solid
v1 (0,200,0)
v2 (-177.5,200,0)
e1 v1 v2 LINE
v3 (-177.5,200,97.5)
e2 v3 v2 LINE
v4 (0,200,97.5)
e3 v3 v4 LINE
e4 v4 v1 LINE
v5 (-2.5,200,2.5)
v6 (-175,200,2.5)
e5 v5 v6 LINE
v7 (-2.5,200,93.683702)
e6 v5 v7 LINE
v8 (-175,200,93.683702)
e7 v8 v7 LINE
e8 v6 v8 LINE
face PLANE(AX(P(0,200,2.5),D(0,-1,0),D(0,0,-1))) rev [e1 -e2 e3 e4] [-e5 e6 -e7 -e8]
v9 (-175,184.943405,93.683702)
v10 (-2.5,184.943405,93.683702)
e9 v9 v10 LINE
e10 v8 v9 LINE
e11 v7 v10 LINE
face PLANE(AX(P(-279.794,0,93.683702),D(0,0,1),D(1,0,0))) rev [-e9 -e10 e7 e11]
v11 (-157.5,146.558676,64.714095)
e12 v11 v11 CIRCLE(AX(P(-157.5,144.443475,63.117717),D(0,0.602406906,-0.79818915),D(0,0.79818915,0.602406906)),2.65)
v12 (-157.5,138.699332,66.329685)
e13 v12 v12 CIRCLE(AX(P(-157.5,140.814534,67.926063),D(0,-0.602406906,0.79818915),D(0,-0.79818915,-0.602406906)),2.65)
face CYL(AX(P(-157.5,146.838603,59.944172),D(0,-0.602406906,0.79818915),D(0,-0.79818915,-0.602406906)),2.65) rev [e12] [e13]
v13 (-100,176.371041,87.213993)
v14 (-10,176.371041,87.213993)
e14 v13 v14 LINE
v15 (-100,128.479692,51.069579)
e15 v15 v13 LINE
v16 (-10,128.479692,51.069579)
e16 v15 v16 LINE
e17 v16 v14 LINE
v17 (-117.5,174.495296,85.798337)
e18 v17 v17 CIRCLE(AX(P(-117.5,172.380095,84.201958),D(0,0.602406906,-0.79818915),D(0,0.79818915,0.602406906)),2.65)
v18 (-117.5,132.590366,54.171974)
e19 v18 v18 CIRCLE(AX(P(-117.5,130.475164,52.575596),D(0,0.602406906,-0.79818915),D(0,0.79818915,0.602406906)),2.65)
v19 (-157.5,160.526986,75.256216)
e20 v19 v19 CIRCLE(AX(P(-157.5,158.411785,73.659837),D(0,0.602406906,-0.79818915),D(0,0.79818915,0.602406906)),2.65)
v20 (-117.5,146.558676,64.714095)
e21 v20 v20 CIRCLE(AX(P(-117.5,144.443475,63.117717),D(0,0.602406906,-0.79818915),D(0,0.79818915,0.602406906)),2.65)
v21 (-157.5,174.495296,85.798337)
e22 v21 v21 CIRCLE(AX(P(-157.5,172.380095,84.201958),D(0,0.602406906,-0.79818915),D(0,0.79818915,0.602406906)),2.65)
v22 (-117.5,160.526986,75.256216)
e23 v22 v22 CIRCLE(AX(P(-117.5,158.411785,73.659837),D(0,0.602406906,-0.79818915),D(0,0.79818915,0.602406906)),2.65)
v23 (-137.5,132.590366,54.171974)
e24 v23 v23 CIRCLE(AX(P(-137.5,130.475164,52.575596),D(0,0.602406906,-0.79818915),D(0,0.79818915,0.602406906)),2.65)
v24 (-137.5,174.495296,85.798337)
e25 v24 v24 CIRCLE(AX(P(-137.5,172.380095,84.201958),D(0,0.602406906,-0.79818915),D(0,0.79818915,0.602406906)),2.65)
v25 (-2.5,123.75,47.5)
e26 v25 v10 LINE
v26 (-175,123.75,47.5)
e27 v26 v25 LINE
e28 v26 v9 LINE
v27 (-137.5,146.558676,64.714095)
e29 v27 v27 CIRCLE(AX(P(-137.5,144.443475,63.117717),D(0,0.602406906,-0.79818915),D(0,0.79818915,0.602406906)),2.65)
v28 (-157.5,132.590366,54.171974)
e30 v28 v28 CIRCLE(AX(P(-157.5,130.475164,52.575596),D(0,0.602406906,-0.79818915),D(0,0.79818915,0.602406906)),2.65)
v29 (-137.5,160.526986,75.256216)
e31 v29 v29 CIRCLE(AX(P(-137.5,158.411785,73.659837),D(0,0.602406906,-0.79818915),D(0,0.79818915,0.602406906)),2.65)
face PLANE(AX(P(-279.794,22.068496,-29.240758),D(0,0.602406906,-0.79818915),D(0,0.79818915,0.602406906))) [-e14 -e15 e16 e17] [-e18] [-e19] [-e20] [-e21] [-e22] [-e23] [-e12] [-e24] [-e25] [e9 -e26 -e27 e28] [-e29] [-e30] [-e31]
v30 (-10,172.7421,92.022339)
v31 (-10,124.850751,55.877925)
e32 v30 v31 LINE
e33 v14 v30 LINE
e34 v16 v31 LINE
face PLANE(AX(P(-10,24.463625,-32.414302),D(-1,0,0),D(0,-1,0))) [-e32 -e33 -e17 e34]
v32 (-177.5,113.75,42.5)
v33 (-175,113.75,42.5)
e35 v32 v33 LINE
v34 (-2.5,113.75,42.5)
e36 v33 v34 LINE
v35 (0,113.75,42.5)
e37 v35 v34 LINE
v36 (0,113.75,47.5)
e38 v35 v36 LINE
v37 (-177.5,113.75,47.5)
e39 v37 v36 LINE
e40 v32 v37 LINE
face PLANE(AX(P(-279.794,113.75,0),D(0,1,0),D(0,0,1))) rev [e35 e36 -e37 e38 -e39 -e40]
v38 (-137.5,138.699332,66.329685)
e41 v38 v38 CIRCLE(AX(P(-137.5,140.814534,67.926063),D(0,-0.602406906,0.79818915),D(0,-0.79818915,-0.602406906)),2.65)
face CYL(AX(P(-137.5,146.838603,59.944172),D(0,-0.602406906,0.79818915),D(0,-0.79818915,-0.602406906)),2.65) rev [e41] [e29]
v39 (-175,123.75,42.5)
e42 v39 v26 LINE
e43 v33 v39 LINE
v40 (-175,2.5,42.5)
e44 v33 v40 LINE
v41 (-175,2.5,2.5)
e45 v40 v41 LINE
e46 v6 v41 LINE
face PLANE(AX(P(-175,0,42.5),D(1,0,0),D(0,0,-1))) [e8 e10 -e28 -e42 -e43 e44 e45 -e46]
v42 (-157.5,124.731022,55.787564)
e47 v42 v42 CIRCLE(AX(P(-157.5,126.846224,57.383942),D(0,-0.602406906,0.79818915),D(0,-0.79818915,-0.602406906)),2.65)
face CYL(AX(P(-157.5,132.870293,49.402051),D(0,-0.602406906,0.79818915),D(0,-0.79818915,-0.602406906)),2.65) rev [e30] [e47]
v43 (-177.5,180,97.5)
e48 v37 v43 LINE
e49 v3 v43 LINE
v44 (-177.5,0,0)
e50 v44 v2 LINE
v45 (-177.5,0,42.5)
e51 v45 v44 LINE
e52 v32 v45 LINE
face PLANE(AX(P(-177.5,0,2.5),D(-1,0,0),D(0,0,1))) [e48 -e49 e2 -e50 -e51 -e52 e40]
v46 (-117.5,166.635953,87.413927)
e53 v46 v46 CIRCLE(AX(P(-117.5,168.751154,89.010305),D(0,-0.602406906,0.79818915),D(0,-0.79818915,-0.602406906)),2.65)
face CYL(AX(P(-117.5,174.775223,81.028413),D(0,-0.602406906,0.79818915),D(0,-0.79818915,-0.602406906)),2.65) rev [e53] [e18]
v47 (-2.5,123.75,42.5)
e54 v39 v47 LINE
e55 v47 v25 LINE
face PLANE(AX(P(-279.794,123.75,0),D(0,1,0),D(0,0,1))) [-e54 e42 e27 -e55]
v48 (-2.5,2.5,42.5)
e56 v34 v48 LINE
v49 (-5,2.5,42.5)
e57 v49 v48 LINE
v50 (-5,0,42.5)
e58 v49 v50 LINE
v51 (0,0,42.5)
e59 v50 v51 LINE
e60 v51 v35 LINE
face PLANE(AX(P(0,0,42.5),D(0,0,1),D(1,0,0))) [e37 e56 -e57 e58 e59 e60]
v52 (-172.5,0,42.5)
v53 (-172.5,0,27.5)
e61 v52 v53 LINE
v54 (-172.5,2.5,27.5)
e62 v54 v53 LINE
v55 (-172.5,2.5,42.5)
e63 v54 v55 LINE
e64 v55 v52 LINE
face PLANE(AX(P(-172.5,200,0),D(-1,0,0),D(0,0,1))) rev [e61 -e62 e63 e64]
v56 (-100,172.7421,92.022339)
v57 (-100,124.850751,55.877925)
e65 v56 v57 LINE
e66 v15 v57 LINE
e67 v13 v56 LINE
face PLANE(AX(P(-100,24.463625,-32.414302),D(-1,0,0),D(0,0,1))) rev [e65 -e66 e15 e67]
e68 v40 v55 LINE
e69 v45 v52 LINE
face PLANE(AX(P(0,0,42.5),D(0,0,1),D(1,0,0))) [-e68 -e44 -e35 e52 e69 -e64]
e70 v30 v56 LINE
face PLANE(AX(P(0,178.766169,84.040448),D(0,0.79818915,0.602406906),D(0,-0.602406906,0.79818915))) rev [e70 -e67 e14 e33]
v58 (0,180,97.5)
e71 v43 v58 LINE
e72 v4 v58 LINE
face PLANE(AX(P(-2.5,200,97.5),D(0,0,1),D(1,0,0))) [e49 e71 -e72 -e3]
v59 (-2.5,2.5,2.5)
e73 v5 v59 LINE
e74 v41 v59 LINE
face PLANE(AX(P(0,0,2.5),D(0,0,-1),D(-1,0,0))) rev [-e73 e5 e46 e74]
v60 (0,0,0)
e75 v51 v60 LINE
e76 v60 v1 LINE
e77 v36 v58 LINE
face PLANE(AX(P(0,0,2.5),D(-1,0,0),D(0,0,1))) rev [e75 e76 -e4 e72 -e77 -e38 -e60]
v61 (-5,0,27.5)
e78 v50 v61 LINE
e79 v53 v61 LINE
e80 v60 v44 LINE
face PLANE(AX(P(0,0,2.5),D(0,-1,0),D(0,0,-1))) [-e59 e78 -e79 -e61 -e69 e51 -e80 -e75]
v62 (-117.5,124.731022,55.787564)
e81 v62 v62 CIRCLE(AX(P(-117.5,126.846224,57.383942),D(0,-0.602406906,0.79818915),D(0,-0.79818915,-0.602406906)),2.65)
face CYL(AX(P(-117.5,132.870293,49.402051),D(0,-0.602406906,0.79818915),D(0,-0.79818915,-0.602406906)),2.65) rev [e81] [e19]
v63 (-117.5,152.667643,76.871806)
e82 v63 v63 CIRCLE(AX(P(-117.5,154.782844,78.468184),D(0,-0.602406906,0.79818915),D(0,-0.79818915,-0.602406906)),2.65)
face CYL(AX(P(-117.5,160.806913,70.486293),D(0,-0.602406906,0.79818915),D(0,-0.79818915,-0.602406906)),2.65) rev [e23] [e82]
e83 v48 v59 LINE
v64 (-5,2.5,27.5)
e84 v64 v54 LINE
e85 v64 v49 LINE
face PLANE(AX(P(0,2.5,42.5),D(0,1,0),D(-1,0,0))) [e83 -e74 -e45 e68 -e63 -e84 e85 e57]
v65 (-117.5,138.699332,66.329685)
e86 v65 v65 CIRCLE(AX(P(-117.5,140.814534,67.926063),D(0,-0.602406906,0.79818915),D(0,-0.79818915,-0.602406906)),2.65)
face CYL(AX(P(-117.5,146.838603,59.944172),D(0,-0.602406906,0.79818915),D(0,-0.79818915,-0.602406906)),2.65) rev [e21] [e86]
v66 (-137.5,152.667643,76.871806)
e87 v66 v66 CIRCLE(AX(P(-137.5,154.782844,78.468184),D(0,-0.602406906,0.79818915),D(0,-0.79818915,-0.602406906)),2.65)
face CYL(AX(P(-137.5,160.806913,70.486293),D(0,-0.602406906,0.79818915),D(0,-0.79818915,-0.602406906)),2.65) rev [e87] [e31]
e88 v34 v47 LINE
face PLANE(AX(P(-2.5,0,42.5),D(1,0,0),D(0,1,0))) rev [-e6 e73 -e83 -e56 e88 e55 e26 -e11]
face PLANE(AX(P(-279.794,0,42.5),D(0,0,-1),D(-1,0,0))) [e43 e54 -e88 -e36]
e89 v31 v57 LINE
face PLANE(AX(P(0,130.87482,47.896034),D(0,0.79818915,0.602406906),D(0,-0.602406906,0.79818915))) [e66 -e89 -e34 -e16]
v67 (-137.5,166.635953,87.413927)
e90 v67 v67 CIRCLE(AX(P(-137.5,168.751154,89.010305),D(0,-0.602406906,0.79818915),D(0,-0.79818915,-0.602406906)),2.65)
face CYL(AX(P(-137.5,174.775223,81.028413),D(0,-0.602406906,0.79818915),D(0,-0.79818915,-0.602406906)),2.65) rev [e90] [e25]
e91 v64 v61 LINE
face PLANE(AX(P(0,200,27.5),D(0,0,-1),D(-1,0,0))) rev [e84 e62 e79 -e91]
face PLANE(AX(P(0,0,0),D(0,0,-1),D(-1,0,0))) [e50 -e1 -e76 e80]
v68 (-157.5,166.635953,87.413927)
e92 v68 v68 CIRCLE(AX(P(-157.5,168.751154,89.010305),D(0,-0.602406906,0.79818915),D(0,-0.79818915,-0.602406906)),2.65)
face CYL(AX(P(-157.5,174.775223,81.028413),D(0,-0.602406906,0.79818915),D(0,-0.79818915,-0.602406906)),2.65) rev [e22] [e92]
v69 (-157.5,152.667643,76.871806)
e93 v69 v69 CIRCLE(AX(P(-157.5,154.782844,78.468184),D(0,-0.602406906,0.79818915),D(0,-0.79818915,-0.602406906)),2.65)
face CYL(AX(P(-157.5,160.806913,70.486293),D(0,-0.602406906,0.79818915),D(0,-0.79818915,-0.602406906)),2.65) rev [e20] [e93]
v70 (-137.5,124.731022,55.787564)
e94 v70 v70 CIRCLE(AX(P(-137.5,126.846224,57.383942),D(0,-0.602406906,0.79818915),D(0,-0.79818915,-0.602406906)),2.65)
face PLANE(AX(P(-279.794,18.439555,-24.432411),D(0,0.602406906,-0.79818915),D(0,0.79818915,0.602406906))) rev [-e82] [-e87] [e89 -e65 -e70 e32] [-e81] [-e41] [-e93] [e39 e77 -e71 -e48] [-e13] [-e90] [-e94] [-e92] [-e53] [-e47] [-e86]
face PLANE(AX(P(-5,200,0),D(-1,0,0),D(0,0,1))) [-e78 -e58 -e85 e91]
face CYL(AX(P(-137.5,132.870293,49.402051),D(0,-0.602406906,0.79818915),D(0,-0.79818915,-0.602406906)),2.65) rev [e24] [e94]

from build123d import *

# Parameters (mm, degrees)
SKETCH1_W                 = 200
SKETCH1_H                 = 177.5
BOSS_EXTRUDE1_DEPTH       = 2.5
BOSS_EXTRUDE2_DEPTH       = 40
SKETCH5_W                 = 86.25
SKETCH5_H                 = 95
BOSS_EXTRUDE3_DEPTH       = 2.5
CUT_EXTRUDE1_DEPTH        = 285.62694883
CUT_EXTRUDE1_DEPTH_BACK   = 285.62694883
BOSS_EXTRUDE4_START       = -177.5
BOSS_EXTRUDE4_DEPTH       = 177.5
SKETCH9_W                 = 167.5
SKETCH9_H                 = 15
CUT_EXTRUDE2_DEPTH        = 285.62694883
SKETCH15_R                = 2.65
CUT_EXTRUDE5_DEPTH        = 10
LPATTERN1_COUNT           = 4
LPATTERN1_PITCH           = 17.5
LPATTERN2_COUNT           = 3
LPATTERN2_PITCH           = 20
LPATTERN2_COPY_1_SKETCH_R = 2.65
LPATTERN2_COPY_1_DEPTH    = 10
LPATTERN2_COPY_2_SKETCH_R = 2.65
LPATTERN2_COPY_2_DEPTH    = 10
LPATTERN2_COPY_3_SKETCH_R = 2.65
LPATTERN2_COPY_3_DEPTH    = 10
LPATTERN2_COPY_4_SKETCH_R = 2.65
LPATTERN2_COPY_4_DEPTH    = 10
LPATTERN2_COPY_5_SKETCH_R = 2.65
LPATTERN2_COPY_5_DEPTH    = 10
LPATTERN2_COPY_6_SKETCH_R = 2.65
LPATTERN2_COPY_6_DEPTH    = 10
SKETCH16_W                = 90
SKETCH16_H                = 60
CUT_EXTRUDE6_DEPTH        = 10


# Read off the part's stored shape, not the designer's step: Boss-Extrude2
with BuildPart() as part:
    # Sketch1 → Boss-Extrude1 (new body)
    with BuildSketch(Plane(origin=(0, 0, 0), x_dir=(0, 1, 0), z_dir=(0, 0, 1))):
        with Locations((100, 88.75)):
            Rectangle(SKETCH1_W, SKETCH1_H)
    extrude(amount=BOSS_EXTRUDE1_DEPTH)

    # Boss-Extrude2 outline → Boss-Extrude2 (add)
    with BuildSketch(Plane.XY.offset(2.5)):
        Polygon((-177.5, 143.75), (-177.5, 0), (0, 0), (0, 143.75), (-2.5, 143.75), (-2.5, 2.5), (-175, 2.5), (-175, 143.75), align=None)
    extrude(amount=BOSS_EXTRUDE2_DEPTH)

    # Sketch5 → Boss-Extrude3 (add)
    with BuildSketch(Plane.YZ):
        with Locations((156.875, 50)):
            Rectangle(SKETCH5_W, SKETCH5_H)
    boss_extrude3 = extrude(amount=-BOSS_EXTRUDE3_DEPTH)

    # Mirror2: Boss-Extrude3 across plane
    add(boss_extrude3.mirror(Plane(origin=(-88.75, 0, 0), x_dir=(0, 0, 1), z_dir=(1, 0, 0))))

    # Sketch6 → Cut-Extrude1 (cut, two sides: drawn at the far end of the back side and taken through both)
    with BuildSketch(Plane.YZ.offset(-CUT_EXTRUDE1_DEPTH_BACK)):
        Polygon((113.75, 97.5), (113.75, 42.5), (180, 97.5), align=None)
    extrude(amount=CUT_EXTRUDE1_DEPTH + CUT_EXTRUDE1_DEPTH_BACK, mode=Mode.SUBTRACT)

    # Sketch7 → Boss-Extrude4 (add)
    with BuildSketch(Plane.YZ.offset(BOSS_EXTRUDE4_START)):
        Polygon((113.75, 47.5), (113.75, 42.5), (123.75, 42.5), (123.75, 47.5), (184.943404756, 93.683701702), (200, 93.683701702), (200, 97.5), (180, 97.5), align=None)
    extrude(amount=BOSS_EXTRUDE4_DEPTH)

    # Sketch9 → Cut-Extrude2 (cut, through all)
    with BuildSketch(Plane.XZ):
        with Locations((-88.75, 35)):
            Rectangle(SKETCH9_W, SKETCH9_H)
    extrude(amount=-CUT_EXTRUDE2_DEPTH, mode=Mode.SUBTRACT)

    # Sketch15 → Cut-Extrude5 (cut)
    with BuildSketch(Plane(origin=(0, 18.439555455, -24.432410978), x_dir=(1, 0, 0), z_dir=(0, -0.6024069059118725, 0.7981891503332306))):
        with Locations(Location((-157.5, 188.315762576, 0), (0, 0, 270))):
            Circle(SKETCH15_R)
    cut_extrude5 = extrude(amount=-CUT_EXTRUDE5_DEPTH, mode=Mode.SUBTRACT)

    # LPattern1: Cut-Extrude5 ×4
    with Locations(*[Vector(0, -0.7981891503332306, -0.6024069059118724) * (i * LPATTERN1_PITCH) for i in range(1, LPATTERN1_COUNT)]):
        add(cut_extrude5, mode=Mode.SUBTRACT)

    # LPattern2: Cut-Extrude5 ×3
    with Locations(*[(i * LPATTERN2_PITCH, 0, 0) for i in range(1, LPATTERN2_COUNT)]):
        add(cut_extrude5, mode=Mode.SUBTRACT)

    # LPattern2 copy 1 sketch → LPattern2 copy 1 (cut)
    with BuildSketch(Plane(origin=(20, 4.471245324, -34.974531831), x_dir=(1, 0, 0), z_dir=(0, -0.6024069059118725, 0.7981891503332306))):
        with Locations(Location((-157.5, 188.315762576, 0), (0, 0, 270))):
            Circle(LPATTERN2_COPY_1_SKETCH_R)
    extrude(amount=-LPATTERN2_COPY_1_DEPTH, mode=Mode.SUBTRACT)

    # LPattern2 copy 2 sketch → LPattern2 copy 2 (cut)
    with BuildSketch(Plane(origin=(40, 4.471245324, -34.974531831), x_dir=(1, 0, 0), z_dir=(0, -0.6024069059118725, 0.7981891503332306))):
        with Locations(Location((-157.5, 188.315762576, 0), (0, 0, 270))):
            Circle(LPATTERN2_COPY_2_SKETCH_R)
    extrude(amount=-LPATTERN2_COPY_2_DEPTH, mode=Mode.SUBTRACT)

    # LPattern2 copy 3 sketch → LPattern2 copy 3 (cut)
    with BuildSketch(Plane(origin=(20, -9.497064807, -45.516652684), x_dir=(1, 0, 0), z_dir=(0, -0.6024069059118725, 0.7981891503332306))):
        with Locations(Location((-157.5, 188.315762576, 0), (0, 0, 270))):
            Circle(LPATTERN2_COPY_3_SKETCH_R)
    extrude(amount=-LPATTERN2_COPY_3_DEPTH, mode=Mode.SUBTRACT)

    # LPattern2 copy 4 sketch → LPattern2 copy 4 (cut)
    with BuildSketch(Plane(origin=(40, -9.497064807, -45.516652684), x_dir=(1, 0, 0), z_dir=(0, -0.6024069059118725, 0.7981891503332306))):
        with Locations(Location((-157.5, 188.315762576, 0), (0, 0, 270))):
            Circle(LPATTERN2_COPY_4_SKETCH_R)
    extrude(amount=-LPATTERN2_COPY_4_DEPTH, mode=Mode.SUBTRACT)

    # LPattern2 copy 5 sketch → LPattern2 copy 5 (cut)
    with BuildSketch(Plane(origin=(20, -23.465374938, -56.058773538), x_dir=(1, 0, 0), z_dir=(0, -0.6024069059118725, 0.7981891503332306))):
        with Locations(Location((-157.5, 188.315762576, 0), (0, 0, 270))):
            Circle(LPATTERN2_COPY_5_SKETCH_R)
    extrude(amount=-LPATTERN2_COPY_5_DEPTH, mode=Mode.SUBTRACT)

    # LPattern2 copy 6 sketch → LPattern2 copy 6 (cut)
    with BuildSketch(Plane(origin=(40, -23.465374938, -56.058773538), x_dir=(1, 0, 0), z_dir=(0, -0.6024069059118725, 0.7981891503332306))):
        with Locations(Location((-157.5, 188.315762576, 0), (0, 0, 270))):
            Circle(LPATTERN2_COPY_6_SKETCH_R)
    extrude(amount=-LPATTERN2_COPY_6_DEPTH, mode=Mode.SUBTRACT)

    # Sketch16 → Cut-Extrude6 (cut)
    with BuildSketch(Plane(origin=(0, 18.439555455, -24.432410978), x_dir=(1, 0, 0), z_dir=(0, -0.6024069059118724, 0.7981891503332307))):
        with Locations((-55, 163.315762576)):
            Rectangle(SKETCH16_W, SKETCH16_H)
    extrude(amount=-CUT_EXTRUDE6_DEPTH, mode=Mode.SUBTRACT)


solid = part.part
